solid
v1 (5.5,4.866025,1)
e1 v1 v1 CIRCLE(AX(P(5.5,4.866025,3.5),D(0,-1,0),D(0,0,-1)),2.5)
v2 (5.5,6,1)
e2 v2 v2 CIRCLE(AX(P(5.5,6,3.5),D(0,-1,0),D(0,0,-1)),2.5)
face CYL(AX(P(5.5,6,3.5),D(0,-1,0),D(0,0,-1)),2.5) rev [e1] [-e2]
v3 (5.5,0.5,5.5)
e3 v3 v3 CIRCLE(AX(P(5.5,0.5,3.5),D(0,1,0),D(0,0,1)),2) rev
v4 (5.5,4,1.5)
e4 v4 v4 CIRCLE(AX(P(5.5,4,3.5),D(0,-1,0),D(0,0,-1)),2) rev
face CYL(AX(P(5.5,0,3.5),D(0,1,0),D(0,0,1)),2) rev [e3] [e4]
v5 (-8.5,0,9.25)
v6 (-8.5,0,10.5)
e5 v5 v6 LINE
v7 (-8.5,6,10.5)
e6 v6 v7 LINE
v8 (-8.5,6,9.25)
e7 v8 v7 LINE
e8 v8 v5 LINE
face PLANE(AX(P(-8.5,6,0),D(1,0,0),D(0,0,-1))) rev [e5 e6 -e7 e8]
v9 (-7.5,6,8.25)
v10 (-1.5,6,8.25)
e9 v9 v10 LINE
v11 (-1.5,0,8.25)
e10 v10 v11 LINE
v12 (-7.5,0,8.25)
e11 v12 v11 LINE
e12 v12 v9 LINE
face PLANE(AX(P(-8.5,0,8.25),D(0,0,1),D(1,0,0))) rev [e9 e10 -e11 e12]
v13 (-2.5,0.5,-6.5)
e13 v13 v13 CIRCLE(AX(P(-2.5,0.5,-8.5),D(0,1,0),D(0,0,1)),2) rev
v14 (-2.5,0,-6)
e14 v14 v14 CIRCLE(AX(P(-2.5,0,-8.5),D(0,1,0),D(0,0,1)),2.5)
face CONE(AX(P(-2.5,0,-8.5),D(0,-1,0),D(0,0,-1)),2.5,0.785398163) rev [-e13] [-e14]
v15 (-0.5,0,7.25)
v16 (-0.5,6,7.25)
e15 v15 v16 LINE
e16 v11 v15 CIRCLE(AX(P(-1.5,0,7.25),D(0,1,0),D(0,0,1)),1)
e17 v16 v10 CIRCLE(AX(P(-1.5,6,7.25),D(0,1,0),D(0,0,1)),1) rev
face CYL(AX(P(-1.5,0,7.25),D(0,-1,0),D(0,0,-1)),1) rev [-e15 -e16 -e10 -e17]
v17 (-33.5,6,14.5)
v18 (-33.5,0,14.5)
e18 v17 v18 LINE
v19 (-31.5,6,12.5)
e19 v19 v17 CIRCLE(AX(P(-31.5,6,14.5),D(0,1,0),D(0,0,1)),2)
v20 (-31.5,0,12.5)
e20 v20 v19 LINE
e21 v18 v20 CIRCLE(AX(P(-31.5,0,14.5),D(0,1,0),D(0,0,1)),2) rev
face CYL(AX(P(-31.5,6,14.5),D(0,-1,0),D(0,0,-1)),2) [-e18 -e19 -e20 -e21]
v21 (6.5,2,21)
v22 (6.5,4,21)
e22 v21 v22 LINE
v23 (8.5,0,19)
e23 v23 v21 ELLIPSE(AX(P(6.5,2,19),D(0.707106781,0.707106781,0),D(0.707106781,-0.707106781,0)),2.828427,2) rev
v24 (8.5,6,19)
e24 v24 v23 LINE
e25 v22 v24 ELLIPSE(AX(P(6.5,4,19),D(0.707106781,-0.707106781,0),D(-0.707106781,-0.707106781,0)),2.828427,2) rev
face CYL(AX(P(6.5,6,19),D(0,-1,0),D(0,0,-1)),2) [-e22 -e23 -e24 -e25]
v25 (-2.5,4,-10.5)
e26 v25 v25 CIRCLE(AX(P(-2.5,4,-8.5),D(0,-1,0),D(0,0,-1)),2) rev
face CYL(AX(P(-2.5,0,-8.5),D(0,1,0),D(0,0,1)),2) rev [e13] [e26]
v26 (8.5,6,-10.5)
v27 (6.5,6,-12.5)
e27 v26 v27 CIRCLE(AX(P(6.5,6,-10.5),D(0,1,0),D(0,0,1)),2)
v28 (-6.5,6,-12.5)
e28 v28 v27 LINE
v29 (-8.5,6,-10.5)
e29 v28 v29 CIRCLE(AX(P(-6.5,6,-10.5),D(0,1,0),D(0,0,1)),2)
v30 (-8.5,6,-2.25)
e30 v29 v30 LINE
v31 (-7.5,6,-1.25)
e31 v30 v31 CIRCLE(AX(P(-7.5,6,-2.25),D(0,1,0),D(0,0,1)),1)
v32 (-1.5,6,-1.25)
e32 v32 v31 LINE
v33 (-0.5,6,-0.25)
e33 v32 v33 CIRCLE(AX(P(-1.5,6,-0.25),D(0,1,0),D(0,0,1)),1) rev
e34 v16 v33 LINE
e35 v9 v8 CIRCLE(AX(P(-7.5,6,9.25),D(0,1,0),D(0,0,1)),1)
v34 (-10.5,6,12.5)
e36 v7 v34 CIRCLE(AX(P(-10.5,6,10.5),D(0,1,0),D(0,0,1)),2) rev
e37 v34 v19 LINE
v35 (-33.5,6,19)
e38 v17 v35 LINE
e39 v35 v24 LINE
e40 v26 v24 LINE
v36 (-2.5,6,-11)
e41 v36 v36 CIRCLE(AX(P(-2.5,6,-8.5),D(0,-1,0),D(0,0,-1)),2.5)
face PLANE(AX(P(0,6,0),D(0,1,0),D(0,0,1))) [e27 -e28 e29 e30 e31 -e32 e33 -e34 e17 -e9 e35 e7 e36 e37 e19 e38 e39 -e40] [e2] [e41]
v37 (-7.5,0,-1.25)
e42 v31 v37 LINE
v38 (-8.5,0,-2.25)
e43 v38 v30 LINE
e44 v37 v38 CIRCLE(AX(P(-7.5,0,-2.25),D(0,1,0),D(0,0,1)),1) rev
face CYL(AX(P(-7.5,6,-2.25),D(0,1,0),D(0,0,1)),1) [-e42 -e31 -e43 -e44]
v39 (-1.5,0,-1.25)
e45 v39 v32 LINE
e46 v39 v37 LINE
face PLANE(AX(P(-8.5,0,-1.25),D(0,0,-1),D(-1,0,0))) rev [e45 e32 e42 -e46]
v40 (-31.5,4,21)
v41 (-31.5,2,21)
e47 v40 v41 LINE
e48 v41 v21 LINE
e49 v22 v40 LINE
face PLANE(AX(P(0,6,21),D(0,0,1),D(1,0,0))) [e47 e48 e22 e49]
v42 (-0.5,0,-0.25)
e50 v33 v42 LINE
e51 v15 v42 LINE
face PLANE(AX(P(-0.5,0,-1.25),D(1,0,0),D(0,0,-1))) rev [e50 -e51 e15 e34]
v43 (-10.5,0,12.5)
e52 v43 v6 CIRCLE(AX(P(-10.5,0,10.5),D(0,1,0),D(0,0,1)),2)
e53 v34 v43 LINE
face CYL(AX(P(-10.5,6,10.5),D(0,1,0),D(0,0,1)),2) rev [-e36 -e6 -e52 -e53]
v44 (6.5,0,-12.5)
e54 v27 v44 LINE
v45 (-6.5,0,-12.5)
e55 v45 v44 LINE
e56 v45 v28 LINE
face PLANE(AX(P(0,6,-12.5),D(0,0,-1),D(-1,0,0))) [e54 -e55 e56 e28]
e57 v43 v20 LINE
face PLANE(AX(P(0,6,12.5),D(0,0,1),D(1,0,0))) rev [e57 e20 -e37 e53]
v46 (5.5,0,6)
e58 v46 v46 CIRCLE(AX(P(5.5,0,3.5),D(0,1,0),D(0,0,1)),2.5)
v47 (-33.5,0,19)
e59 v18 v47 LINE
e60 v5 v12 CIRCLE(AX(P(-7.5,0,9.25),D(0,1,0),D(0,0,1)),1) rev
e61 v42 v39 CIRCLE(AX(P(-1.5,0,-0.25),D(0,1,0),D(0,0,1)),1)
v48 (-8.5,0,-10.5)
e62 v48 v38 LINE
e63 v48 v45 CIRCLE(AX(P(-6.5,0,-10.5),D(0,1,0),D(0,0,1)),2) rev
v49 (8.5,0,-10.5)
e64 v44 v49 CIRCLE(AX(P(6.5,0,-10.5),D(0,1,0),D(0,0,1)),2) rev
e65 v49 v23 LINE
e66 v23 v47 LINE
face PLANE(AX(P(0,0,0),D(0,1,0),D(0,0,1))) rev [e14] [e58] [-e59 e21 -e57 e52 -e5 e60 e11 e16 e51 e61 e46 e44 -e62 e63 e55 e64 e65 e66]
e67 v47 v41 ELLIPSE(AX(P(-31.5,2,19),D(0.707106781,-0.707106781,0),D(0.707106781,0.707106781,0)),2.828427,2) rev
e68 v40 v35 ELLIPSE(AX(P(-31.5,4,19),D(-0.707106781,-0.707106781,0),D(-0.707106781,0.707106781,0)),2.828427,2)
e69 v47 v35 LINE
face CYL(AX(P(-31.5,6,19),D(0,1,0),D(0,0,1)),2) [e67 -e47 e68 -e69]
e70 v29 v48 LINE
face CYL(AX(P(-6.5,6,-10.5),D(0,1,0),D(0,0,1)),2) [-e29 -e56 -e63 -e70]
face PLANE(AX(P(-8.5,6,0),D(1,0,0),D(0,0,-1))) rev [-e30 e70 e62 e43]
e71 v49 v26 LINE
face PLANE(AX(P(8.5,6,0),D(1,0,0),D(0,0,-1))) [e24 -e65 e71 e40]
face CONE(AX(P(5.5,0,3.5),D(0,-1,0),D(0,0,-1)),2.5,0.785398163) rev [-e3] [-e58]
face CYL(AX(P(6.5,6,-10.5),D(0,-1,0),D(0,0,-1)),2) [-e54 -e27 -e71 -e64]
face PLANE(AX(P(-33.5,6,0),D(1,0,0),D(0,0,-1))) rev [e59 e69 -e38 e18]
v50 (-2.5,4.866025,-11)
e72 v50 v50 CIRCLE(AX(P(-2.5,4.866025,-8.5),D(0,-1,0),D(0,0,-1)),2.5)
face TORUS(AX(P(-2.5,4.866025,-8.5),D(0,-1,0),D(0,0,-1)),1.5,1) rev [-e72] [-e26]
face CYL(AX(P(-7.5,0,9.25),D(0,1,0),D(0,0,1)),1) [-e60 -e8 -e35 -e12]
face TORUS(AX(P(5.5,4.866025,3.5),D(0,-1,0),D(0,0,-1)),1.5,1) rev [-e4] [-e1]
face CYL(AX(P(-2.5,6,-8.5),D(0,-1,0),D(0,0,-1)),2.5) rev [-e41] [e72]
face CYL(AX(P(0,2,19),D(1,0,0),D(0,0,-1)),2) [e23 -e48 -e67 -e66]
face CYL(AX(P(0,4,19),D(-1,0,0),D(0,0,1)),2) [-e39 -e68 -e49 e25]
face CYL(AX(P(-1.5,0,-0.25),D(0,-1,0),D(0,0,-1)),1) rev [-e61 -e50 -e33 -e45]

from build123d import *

# Parameters (mm, degrees)
SKETCH1_W           = 17
SKETCH1_H           = 25
BOSS_EXTRUDE1_DEPTH = 6
SKETCH2_R           = 2
CUT_EXTRUDE1_DEPTH  = 40.990623901
FILLET2_R           = 2
FILLET1_R           = 2
CUT_EXTRUDE2_START  = -4
SKETCH3_R           = 2.5
CUT_EXTRUDE2_DEPTH  = 36.990623901
FILLET3_R           = 1
CHAMFER1_SIZE       = 0.5
SKETCH4_W           = 8
SKETCH4_H           = 9.5
CUT_EXTRUDE3_DEPTH  = 40.990623901
FILLET4_R           = 1


with BuildPart() as part:
    # Sketch1 → Boss-Extrude1 (new body)
    with BuildSketch(Plane(origin=(0, 0, 0), x_dir=(1, 0, 0), z_dir=(0, 1, 0))):
        Polygon((8.5, -12.5), (-8.5, -12.5), (-33.5, -12.5), (-33.5, -21), (8.5, -21), align=None)
        Rectangle(SKETCH1_W, SKETCH1_H)
    extrude(amount=BOSS_EXTRUDE1_DEPTH)

    # Sketch2 → Cut-Extrude1 (cut, through all)
    with BuildSketch(Plane(origin=(0, 6, 0), x_dir=(1, 0, 0), z_dir=(0, 1, 0))):
        with Locations(Location((-2.5, 8.5, 0), (0, 0, 270))):
            Circle(SKETCH2_R)
        with Locations(Location((5.5, -3.5, 0), (0, 0, 270))):
            Circle(SKETCH2_R)
    extrude(amount=-CUT_EXTRUDE1_DEPTH, mode=Mode.SUBTRACT)

    # Fillet2
    fillet2_edges = [part.edges().sort_by_distance(p)[0] for p in [
        (8.5, 3, 21),
        (-33.5, 3, 21),
        (-12.5, 6, 21),
        (-12.5, 0, 21),
    ]]
    fillet(fillet2_edges, radius=FILLET2_R)

    # Fillet1
    fillet1_edges = [part.edges().sort_by_distance(p)[0] for p in [
        (-8.5, 3, 12.5),
        (-8.5, 3, -12.5),
        (8.5, 3, -12.5),
        (-33.5, 3, 12.5),
    ]]
    fillet(fillet1_edges, radius=FILLET1_R)

    # Sketch3 → Cut-Extrude2 (cut, through all)
    with BuildSketch(Plane.XZ.offset(CUT_EXTRUDE2_START)):
        with Locations(Location((5.5, 3.5, 0), (0, 0, 270))):
            Circle(SKETCH3_R)
        with Locations(Location((-2.5, -8.5, 0), (0, 0, 270))):
            Circle(SKETCH3_R)
    extrude(amount=-CUT_EXTRUDE2_DEPTH, mode=Mode.SUBTRACT)

    # Fillet3
    # the kernel refuses this fillet: 1 mm, written as the material it adds along each edge
    with BuildSketch(Plane(origin=(5.5, 4, 3.5), x_dir=(0, 0, -1), z_dir=(-1, 0, 0))) as fillet3_piece_1:
        with BuildLine():
            CenterArc((1.5, -0.866025404), FILLET3_R, 0, 60)
            Line((2.5, -0.866025404), (2.52, -0.866025404))
            Line((2.52, -0.866025404), (2.52, 0))
            Line((2.52, 0), (2.5, 0.02))
            ThreePointArc((2.5, 0.02), (2.25, 0.02), (2.01, 0.017320508))
            Line((2.01, 0.017320508), (2, 0))
        make_face()
    revolve(axis=Axis((5.5, 4, 3.5), (0, -1, 0)))
    with BuildSketch(Plane(origin=(-2.5, 4, -8.5), x_dir=(0, 0, -1), z_dir=(-1, 0, 0))) as fillet3_piece_2:
        with BuildLine():
            CenterArc((1.5, -0.866025404), FILLET3_R, 0, 60)
            Line((2.5, -0.866025404), (2.52, -0.866025404))
            Line((2.52, -0.866025404), (2.52, 0))
            Line((2.52, 0), (2.5, 0.02))
            ThreePointArc((2.5, 0.02), (2.25, 0.02), (2.01, 0.017320508))
            Line((2.01, 0.017320508), (2, 0))
        make_face()
    revolve(axis=Axis((-2.5, 4, -8.5), (0, -1, 0)))

    # Chamfer1
    chamfer1_edges = [part.edges().sort_by_distance(p)[0] for p in [
        (-2.5, 0, -10.5),
        (5.5, 0, 1.5),
    ]]
    chamfer(chamfer1_edges, length=CHAMFER1_SIZE)

    # Sketch4 → Cut-Extrude3 (cut, through all)
    with BuildSketch(Plane(origin=(0, 6, 0), x_dir=(1, 0, 0), z_dir=(0, 1, 0))):
        with Locations((-4.5, -3.5)):
            Rectangle(SKETCH4_W, SKETCH4_H)
    extrude(amount=-CUT_EXTRUDE3_DEPTH, mode=Mode.SUBTRACT)

    # Fillet4
    fillet4_edges = [part.edges().sort_by_distance(p)[0] for p in [
        (-0.5, 3, -1.25),
        (-0.5, 3, 8.25),
        (-8.5, 3, 8.25),
        (-8.5, 3, -1.25),
    ]]
    fillet(fillet4_edges, radius=FILLET4_R)


solid = part.part
